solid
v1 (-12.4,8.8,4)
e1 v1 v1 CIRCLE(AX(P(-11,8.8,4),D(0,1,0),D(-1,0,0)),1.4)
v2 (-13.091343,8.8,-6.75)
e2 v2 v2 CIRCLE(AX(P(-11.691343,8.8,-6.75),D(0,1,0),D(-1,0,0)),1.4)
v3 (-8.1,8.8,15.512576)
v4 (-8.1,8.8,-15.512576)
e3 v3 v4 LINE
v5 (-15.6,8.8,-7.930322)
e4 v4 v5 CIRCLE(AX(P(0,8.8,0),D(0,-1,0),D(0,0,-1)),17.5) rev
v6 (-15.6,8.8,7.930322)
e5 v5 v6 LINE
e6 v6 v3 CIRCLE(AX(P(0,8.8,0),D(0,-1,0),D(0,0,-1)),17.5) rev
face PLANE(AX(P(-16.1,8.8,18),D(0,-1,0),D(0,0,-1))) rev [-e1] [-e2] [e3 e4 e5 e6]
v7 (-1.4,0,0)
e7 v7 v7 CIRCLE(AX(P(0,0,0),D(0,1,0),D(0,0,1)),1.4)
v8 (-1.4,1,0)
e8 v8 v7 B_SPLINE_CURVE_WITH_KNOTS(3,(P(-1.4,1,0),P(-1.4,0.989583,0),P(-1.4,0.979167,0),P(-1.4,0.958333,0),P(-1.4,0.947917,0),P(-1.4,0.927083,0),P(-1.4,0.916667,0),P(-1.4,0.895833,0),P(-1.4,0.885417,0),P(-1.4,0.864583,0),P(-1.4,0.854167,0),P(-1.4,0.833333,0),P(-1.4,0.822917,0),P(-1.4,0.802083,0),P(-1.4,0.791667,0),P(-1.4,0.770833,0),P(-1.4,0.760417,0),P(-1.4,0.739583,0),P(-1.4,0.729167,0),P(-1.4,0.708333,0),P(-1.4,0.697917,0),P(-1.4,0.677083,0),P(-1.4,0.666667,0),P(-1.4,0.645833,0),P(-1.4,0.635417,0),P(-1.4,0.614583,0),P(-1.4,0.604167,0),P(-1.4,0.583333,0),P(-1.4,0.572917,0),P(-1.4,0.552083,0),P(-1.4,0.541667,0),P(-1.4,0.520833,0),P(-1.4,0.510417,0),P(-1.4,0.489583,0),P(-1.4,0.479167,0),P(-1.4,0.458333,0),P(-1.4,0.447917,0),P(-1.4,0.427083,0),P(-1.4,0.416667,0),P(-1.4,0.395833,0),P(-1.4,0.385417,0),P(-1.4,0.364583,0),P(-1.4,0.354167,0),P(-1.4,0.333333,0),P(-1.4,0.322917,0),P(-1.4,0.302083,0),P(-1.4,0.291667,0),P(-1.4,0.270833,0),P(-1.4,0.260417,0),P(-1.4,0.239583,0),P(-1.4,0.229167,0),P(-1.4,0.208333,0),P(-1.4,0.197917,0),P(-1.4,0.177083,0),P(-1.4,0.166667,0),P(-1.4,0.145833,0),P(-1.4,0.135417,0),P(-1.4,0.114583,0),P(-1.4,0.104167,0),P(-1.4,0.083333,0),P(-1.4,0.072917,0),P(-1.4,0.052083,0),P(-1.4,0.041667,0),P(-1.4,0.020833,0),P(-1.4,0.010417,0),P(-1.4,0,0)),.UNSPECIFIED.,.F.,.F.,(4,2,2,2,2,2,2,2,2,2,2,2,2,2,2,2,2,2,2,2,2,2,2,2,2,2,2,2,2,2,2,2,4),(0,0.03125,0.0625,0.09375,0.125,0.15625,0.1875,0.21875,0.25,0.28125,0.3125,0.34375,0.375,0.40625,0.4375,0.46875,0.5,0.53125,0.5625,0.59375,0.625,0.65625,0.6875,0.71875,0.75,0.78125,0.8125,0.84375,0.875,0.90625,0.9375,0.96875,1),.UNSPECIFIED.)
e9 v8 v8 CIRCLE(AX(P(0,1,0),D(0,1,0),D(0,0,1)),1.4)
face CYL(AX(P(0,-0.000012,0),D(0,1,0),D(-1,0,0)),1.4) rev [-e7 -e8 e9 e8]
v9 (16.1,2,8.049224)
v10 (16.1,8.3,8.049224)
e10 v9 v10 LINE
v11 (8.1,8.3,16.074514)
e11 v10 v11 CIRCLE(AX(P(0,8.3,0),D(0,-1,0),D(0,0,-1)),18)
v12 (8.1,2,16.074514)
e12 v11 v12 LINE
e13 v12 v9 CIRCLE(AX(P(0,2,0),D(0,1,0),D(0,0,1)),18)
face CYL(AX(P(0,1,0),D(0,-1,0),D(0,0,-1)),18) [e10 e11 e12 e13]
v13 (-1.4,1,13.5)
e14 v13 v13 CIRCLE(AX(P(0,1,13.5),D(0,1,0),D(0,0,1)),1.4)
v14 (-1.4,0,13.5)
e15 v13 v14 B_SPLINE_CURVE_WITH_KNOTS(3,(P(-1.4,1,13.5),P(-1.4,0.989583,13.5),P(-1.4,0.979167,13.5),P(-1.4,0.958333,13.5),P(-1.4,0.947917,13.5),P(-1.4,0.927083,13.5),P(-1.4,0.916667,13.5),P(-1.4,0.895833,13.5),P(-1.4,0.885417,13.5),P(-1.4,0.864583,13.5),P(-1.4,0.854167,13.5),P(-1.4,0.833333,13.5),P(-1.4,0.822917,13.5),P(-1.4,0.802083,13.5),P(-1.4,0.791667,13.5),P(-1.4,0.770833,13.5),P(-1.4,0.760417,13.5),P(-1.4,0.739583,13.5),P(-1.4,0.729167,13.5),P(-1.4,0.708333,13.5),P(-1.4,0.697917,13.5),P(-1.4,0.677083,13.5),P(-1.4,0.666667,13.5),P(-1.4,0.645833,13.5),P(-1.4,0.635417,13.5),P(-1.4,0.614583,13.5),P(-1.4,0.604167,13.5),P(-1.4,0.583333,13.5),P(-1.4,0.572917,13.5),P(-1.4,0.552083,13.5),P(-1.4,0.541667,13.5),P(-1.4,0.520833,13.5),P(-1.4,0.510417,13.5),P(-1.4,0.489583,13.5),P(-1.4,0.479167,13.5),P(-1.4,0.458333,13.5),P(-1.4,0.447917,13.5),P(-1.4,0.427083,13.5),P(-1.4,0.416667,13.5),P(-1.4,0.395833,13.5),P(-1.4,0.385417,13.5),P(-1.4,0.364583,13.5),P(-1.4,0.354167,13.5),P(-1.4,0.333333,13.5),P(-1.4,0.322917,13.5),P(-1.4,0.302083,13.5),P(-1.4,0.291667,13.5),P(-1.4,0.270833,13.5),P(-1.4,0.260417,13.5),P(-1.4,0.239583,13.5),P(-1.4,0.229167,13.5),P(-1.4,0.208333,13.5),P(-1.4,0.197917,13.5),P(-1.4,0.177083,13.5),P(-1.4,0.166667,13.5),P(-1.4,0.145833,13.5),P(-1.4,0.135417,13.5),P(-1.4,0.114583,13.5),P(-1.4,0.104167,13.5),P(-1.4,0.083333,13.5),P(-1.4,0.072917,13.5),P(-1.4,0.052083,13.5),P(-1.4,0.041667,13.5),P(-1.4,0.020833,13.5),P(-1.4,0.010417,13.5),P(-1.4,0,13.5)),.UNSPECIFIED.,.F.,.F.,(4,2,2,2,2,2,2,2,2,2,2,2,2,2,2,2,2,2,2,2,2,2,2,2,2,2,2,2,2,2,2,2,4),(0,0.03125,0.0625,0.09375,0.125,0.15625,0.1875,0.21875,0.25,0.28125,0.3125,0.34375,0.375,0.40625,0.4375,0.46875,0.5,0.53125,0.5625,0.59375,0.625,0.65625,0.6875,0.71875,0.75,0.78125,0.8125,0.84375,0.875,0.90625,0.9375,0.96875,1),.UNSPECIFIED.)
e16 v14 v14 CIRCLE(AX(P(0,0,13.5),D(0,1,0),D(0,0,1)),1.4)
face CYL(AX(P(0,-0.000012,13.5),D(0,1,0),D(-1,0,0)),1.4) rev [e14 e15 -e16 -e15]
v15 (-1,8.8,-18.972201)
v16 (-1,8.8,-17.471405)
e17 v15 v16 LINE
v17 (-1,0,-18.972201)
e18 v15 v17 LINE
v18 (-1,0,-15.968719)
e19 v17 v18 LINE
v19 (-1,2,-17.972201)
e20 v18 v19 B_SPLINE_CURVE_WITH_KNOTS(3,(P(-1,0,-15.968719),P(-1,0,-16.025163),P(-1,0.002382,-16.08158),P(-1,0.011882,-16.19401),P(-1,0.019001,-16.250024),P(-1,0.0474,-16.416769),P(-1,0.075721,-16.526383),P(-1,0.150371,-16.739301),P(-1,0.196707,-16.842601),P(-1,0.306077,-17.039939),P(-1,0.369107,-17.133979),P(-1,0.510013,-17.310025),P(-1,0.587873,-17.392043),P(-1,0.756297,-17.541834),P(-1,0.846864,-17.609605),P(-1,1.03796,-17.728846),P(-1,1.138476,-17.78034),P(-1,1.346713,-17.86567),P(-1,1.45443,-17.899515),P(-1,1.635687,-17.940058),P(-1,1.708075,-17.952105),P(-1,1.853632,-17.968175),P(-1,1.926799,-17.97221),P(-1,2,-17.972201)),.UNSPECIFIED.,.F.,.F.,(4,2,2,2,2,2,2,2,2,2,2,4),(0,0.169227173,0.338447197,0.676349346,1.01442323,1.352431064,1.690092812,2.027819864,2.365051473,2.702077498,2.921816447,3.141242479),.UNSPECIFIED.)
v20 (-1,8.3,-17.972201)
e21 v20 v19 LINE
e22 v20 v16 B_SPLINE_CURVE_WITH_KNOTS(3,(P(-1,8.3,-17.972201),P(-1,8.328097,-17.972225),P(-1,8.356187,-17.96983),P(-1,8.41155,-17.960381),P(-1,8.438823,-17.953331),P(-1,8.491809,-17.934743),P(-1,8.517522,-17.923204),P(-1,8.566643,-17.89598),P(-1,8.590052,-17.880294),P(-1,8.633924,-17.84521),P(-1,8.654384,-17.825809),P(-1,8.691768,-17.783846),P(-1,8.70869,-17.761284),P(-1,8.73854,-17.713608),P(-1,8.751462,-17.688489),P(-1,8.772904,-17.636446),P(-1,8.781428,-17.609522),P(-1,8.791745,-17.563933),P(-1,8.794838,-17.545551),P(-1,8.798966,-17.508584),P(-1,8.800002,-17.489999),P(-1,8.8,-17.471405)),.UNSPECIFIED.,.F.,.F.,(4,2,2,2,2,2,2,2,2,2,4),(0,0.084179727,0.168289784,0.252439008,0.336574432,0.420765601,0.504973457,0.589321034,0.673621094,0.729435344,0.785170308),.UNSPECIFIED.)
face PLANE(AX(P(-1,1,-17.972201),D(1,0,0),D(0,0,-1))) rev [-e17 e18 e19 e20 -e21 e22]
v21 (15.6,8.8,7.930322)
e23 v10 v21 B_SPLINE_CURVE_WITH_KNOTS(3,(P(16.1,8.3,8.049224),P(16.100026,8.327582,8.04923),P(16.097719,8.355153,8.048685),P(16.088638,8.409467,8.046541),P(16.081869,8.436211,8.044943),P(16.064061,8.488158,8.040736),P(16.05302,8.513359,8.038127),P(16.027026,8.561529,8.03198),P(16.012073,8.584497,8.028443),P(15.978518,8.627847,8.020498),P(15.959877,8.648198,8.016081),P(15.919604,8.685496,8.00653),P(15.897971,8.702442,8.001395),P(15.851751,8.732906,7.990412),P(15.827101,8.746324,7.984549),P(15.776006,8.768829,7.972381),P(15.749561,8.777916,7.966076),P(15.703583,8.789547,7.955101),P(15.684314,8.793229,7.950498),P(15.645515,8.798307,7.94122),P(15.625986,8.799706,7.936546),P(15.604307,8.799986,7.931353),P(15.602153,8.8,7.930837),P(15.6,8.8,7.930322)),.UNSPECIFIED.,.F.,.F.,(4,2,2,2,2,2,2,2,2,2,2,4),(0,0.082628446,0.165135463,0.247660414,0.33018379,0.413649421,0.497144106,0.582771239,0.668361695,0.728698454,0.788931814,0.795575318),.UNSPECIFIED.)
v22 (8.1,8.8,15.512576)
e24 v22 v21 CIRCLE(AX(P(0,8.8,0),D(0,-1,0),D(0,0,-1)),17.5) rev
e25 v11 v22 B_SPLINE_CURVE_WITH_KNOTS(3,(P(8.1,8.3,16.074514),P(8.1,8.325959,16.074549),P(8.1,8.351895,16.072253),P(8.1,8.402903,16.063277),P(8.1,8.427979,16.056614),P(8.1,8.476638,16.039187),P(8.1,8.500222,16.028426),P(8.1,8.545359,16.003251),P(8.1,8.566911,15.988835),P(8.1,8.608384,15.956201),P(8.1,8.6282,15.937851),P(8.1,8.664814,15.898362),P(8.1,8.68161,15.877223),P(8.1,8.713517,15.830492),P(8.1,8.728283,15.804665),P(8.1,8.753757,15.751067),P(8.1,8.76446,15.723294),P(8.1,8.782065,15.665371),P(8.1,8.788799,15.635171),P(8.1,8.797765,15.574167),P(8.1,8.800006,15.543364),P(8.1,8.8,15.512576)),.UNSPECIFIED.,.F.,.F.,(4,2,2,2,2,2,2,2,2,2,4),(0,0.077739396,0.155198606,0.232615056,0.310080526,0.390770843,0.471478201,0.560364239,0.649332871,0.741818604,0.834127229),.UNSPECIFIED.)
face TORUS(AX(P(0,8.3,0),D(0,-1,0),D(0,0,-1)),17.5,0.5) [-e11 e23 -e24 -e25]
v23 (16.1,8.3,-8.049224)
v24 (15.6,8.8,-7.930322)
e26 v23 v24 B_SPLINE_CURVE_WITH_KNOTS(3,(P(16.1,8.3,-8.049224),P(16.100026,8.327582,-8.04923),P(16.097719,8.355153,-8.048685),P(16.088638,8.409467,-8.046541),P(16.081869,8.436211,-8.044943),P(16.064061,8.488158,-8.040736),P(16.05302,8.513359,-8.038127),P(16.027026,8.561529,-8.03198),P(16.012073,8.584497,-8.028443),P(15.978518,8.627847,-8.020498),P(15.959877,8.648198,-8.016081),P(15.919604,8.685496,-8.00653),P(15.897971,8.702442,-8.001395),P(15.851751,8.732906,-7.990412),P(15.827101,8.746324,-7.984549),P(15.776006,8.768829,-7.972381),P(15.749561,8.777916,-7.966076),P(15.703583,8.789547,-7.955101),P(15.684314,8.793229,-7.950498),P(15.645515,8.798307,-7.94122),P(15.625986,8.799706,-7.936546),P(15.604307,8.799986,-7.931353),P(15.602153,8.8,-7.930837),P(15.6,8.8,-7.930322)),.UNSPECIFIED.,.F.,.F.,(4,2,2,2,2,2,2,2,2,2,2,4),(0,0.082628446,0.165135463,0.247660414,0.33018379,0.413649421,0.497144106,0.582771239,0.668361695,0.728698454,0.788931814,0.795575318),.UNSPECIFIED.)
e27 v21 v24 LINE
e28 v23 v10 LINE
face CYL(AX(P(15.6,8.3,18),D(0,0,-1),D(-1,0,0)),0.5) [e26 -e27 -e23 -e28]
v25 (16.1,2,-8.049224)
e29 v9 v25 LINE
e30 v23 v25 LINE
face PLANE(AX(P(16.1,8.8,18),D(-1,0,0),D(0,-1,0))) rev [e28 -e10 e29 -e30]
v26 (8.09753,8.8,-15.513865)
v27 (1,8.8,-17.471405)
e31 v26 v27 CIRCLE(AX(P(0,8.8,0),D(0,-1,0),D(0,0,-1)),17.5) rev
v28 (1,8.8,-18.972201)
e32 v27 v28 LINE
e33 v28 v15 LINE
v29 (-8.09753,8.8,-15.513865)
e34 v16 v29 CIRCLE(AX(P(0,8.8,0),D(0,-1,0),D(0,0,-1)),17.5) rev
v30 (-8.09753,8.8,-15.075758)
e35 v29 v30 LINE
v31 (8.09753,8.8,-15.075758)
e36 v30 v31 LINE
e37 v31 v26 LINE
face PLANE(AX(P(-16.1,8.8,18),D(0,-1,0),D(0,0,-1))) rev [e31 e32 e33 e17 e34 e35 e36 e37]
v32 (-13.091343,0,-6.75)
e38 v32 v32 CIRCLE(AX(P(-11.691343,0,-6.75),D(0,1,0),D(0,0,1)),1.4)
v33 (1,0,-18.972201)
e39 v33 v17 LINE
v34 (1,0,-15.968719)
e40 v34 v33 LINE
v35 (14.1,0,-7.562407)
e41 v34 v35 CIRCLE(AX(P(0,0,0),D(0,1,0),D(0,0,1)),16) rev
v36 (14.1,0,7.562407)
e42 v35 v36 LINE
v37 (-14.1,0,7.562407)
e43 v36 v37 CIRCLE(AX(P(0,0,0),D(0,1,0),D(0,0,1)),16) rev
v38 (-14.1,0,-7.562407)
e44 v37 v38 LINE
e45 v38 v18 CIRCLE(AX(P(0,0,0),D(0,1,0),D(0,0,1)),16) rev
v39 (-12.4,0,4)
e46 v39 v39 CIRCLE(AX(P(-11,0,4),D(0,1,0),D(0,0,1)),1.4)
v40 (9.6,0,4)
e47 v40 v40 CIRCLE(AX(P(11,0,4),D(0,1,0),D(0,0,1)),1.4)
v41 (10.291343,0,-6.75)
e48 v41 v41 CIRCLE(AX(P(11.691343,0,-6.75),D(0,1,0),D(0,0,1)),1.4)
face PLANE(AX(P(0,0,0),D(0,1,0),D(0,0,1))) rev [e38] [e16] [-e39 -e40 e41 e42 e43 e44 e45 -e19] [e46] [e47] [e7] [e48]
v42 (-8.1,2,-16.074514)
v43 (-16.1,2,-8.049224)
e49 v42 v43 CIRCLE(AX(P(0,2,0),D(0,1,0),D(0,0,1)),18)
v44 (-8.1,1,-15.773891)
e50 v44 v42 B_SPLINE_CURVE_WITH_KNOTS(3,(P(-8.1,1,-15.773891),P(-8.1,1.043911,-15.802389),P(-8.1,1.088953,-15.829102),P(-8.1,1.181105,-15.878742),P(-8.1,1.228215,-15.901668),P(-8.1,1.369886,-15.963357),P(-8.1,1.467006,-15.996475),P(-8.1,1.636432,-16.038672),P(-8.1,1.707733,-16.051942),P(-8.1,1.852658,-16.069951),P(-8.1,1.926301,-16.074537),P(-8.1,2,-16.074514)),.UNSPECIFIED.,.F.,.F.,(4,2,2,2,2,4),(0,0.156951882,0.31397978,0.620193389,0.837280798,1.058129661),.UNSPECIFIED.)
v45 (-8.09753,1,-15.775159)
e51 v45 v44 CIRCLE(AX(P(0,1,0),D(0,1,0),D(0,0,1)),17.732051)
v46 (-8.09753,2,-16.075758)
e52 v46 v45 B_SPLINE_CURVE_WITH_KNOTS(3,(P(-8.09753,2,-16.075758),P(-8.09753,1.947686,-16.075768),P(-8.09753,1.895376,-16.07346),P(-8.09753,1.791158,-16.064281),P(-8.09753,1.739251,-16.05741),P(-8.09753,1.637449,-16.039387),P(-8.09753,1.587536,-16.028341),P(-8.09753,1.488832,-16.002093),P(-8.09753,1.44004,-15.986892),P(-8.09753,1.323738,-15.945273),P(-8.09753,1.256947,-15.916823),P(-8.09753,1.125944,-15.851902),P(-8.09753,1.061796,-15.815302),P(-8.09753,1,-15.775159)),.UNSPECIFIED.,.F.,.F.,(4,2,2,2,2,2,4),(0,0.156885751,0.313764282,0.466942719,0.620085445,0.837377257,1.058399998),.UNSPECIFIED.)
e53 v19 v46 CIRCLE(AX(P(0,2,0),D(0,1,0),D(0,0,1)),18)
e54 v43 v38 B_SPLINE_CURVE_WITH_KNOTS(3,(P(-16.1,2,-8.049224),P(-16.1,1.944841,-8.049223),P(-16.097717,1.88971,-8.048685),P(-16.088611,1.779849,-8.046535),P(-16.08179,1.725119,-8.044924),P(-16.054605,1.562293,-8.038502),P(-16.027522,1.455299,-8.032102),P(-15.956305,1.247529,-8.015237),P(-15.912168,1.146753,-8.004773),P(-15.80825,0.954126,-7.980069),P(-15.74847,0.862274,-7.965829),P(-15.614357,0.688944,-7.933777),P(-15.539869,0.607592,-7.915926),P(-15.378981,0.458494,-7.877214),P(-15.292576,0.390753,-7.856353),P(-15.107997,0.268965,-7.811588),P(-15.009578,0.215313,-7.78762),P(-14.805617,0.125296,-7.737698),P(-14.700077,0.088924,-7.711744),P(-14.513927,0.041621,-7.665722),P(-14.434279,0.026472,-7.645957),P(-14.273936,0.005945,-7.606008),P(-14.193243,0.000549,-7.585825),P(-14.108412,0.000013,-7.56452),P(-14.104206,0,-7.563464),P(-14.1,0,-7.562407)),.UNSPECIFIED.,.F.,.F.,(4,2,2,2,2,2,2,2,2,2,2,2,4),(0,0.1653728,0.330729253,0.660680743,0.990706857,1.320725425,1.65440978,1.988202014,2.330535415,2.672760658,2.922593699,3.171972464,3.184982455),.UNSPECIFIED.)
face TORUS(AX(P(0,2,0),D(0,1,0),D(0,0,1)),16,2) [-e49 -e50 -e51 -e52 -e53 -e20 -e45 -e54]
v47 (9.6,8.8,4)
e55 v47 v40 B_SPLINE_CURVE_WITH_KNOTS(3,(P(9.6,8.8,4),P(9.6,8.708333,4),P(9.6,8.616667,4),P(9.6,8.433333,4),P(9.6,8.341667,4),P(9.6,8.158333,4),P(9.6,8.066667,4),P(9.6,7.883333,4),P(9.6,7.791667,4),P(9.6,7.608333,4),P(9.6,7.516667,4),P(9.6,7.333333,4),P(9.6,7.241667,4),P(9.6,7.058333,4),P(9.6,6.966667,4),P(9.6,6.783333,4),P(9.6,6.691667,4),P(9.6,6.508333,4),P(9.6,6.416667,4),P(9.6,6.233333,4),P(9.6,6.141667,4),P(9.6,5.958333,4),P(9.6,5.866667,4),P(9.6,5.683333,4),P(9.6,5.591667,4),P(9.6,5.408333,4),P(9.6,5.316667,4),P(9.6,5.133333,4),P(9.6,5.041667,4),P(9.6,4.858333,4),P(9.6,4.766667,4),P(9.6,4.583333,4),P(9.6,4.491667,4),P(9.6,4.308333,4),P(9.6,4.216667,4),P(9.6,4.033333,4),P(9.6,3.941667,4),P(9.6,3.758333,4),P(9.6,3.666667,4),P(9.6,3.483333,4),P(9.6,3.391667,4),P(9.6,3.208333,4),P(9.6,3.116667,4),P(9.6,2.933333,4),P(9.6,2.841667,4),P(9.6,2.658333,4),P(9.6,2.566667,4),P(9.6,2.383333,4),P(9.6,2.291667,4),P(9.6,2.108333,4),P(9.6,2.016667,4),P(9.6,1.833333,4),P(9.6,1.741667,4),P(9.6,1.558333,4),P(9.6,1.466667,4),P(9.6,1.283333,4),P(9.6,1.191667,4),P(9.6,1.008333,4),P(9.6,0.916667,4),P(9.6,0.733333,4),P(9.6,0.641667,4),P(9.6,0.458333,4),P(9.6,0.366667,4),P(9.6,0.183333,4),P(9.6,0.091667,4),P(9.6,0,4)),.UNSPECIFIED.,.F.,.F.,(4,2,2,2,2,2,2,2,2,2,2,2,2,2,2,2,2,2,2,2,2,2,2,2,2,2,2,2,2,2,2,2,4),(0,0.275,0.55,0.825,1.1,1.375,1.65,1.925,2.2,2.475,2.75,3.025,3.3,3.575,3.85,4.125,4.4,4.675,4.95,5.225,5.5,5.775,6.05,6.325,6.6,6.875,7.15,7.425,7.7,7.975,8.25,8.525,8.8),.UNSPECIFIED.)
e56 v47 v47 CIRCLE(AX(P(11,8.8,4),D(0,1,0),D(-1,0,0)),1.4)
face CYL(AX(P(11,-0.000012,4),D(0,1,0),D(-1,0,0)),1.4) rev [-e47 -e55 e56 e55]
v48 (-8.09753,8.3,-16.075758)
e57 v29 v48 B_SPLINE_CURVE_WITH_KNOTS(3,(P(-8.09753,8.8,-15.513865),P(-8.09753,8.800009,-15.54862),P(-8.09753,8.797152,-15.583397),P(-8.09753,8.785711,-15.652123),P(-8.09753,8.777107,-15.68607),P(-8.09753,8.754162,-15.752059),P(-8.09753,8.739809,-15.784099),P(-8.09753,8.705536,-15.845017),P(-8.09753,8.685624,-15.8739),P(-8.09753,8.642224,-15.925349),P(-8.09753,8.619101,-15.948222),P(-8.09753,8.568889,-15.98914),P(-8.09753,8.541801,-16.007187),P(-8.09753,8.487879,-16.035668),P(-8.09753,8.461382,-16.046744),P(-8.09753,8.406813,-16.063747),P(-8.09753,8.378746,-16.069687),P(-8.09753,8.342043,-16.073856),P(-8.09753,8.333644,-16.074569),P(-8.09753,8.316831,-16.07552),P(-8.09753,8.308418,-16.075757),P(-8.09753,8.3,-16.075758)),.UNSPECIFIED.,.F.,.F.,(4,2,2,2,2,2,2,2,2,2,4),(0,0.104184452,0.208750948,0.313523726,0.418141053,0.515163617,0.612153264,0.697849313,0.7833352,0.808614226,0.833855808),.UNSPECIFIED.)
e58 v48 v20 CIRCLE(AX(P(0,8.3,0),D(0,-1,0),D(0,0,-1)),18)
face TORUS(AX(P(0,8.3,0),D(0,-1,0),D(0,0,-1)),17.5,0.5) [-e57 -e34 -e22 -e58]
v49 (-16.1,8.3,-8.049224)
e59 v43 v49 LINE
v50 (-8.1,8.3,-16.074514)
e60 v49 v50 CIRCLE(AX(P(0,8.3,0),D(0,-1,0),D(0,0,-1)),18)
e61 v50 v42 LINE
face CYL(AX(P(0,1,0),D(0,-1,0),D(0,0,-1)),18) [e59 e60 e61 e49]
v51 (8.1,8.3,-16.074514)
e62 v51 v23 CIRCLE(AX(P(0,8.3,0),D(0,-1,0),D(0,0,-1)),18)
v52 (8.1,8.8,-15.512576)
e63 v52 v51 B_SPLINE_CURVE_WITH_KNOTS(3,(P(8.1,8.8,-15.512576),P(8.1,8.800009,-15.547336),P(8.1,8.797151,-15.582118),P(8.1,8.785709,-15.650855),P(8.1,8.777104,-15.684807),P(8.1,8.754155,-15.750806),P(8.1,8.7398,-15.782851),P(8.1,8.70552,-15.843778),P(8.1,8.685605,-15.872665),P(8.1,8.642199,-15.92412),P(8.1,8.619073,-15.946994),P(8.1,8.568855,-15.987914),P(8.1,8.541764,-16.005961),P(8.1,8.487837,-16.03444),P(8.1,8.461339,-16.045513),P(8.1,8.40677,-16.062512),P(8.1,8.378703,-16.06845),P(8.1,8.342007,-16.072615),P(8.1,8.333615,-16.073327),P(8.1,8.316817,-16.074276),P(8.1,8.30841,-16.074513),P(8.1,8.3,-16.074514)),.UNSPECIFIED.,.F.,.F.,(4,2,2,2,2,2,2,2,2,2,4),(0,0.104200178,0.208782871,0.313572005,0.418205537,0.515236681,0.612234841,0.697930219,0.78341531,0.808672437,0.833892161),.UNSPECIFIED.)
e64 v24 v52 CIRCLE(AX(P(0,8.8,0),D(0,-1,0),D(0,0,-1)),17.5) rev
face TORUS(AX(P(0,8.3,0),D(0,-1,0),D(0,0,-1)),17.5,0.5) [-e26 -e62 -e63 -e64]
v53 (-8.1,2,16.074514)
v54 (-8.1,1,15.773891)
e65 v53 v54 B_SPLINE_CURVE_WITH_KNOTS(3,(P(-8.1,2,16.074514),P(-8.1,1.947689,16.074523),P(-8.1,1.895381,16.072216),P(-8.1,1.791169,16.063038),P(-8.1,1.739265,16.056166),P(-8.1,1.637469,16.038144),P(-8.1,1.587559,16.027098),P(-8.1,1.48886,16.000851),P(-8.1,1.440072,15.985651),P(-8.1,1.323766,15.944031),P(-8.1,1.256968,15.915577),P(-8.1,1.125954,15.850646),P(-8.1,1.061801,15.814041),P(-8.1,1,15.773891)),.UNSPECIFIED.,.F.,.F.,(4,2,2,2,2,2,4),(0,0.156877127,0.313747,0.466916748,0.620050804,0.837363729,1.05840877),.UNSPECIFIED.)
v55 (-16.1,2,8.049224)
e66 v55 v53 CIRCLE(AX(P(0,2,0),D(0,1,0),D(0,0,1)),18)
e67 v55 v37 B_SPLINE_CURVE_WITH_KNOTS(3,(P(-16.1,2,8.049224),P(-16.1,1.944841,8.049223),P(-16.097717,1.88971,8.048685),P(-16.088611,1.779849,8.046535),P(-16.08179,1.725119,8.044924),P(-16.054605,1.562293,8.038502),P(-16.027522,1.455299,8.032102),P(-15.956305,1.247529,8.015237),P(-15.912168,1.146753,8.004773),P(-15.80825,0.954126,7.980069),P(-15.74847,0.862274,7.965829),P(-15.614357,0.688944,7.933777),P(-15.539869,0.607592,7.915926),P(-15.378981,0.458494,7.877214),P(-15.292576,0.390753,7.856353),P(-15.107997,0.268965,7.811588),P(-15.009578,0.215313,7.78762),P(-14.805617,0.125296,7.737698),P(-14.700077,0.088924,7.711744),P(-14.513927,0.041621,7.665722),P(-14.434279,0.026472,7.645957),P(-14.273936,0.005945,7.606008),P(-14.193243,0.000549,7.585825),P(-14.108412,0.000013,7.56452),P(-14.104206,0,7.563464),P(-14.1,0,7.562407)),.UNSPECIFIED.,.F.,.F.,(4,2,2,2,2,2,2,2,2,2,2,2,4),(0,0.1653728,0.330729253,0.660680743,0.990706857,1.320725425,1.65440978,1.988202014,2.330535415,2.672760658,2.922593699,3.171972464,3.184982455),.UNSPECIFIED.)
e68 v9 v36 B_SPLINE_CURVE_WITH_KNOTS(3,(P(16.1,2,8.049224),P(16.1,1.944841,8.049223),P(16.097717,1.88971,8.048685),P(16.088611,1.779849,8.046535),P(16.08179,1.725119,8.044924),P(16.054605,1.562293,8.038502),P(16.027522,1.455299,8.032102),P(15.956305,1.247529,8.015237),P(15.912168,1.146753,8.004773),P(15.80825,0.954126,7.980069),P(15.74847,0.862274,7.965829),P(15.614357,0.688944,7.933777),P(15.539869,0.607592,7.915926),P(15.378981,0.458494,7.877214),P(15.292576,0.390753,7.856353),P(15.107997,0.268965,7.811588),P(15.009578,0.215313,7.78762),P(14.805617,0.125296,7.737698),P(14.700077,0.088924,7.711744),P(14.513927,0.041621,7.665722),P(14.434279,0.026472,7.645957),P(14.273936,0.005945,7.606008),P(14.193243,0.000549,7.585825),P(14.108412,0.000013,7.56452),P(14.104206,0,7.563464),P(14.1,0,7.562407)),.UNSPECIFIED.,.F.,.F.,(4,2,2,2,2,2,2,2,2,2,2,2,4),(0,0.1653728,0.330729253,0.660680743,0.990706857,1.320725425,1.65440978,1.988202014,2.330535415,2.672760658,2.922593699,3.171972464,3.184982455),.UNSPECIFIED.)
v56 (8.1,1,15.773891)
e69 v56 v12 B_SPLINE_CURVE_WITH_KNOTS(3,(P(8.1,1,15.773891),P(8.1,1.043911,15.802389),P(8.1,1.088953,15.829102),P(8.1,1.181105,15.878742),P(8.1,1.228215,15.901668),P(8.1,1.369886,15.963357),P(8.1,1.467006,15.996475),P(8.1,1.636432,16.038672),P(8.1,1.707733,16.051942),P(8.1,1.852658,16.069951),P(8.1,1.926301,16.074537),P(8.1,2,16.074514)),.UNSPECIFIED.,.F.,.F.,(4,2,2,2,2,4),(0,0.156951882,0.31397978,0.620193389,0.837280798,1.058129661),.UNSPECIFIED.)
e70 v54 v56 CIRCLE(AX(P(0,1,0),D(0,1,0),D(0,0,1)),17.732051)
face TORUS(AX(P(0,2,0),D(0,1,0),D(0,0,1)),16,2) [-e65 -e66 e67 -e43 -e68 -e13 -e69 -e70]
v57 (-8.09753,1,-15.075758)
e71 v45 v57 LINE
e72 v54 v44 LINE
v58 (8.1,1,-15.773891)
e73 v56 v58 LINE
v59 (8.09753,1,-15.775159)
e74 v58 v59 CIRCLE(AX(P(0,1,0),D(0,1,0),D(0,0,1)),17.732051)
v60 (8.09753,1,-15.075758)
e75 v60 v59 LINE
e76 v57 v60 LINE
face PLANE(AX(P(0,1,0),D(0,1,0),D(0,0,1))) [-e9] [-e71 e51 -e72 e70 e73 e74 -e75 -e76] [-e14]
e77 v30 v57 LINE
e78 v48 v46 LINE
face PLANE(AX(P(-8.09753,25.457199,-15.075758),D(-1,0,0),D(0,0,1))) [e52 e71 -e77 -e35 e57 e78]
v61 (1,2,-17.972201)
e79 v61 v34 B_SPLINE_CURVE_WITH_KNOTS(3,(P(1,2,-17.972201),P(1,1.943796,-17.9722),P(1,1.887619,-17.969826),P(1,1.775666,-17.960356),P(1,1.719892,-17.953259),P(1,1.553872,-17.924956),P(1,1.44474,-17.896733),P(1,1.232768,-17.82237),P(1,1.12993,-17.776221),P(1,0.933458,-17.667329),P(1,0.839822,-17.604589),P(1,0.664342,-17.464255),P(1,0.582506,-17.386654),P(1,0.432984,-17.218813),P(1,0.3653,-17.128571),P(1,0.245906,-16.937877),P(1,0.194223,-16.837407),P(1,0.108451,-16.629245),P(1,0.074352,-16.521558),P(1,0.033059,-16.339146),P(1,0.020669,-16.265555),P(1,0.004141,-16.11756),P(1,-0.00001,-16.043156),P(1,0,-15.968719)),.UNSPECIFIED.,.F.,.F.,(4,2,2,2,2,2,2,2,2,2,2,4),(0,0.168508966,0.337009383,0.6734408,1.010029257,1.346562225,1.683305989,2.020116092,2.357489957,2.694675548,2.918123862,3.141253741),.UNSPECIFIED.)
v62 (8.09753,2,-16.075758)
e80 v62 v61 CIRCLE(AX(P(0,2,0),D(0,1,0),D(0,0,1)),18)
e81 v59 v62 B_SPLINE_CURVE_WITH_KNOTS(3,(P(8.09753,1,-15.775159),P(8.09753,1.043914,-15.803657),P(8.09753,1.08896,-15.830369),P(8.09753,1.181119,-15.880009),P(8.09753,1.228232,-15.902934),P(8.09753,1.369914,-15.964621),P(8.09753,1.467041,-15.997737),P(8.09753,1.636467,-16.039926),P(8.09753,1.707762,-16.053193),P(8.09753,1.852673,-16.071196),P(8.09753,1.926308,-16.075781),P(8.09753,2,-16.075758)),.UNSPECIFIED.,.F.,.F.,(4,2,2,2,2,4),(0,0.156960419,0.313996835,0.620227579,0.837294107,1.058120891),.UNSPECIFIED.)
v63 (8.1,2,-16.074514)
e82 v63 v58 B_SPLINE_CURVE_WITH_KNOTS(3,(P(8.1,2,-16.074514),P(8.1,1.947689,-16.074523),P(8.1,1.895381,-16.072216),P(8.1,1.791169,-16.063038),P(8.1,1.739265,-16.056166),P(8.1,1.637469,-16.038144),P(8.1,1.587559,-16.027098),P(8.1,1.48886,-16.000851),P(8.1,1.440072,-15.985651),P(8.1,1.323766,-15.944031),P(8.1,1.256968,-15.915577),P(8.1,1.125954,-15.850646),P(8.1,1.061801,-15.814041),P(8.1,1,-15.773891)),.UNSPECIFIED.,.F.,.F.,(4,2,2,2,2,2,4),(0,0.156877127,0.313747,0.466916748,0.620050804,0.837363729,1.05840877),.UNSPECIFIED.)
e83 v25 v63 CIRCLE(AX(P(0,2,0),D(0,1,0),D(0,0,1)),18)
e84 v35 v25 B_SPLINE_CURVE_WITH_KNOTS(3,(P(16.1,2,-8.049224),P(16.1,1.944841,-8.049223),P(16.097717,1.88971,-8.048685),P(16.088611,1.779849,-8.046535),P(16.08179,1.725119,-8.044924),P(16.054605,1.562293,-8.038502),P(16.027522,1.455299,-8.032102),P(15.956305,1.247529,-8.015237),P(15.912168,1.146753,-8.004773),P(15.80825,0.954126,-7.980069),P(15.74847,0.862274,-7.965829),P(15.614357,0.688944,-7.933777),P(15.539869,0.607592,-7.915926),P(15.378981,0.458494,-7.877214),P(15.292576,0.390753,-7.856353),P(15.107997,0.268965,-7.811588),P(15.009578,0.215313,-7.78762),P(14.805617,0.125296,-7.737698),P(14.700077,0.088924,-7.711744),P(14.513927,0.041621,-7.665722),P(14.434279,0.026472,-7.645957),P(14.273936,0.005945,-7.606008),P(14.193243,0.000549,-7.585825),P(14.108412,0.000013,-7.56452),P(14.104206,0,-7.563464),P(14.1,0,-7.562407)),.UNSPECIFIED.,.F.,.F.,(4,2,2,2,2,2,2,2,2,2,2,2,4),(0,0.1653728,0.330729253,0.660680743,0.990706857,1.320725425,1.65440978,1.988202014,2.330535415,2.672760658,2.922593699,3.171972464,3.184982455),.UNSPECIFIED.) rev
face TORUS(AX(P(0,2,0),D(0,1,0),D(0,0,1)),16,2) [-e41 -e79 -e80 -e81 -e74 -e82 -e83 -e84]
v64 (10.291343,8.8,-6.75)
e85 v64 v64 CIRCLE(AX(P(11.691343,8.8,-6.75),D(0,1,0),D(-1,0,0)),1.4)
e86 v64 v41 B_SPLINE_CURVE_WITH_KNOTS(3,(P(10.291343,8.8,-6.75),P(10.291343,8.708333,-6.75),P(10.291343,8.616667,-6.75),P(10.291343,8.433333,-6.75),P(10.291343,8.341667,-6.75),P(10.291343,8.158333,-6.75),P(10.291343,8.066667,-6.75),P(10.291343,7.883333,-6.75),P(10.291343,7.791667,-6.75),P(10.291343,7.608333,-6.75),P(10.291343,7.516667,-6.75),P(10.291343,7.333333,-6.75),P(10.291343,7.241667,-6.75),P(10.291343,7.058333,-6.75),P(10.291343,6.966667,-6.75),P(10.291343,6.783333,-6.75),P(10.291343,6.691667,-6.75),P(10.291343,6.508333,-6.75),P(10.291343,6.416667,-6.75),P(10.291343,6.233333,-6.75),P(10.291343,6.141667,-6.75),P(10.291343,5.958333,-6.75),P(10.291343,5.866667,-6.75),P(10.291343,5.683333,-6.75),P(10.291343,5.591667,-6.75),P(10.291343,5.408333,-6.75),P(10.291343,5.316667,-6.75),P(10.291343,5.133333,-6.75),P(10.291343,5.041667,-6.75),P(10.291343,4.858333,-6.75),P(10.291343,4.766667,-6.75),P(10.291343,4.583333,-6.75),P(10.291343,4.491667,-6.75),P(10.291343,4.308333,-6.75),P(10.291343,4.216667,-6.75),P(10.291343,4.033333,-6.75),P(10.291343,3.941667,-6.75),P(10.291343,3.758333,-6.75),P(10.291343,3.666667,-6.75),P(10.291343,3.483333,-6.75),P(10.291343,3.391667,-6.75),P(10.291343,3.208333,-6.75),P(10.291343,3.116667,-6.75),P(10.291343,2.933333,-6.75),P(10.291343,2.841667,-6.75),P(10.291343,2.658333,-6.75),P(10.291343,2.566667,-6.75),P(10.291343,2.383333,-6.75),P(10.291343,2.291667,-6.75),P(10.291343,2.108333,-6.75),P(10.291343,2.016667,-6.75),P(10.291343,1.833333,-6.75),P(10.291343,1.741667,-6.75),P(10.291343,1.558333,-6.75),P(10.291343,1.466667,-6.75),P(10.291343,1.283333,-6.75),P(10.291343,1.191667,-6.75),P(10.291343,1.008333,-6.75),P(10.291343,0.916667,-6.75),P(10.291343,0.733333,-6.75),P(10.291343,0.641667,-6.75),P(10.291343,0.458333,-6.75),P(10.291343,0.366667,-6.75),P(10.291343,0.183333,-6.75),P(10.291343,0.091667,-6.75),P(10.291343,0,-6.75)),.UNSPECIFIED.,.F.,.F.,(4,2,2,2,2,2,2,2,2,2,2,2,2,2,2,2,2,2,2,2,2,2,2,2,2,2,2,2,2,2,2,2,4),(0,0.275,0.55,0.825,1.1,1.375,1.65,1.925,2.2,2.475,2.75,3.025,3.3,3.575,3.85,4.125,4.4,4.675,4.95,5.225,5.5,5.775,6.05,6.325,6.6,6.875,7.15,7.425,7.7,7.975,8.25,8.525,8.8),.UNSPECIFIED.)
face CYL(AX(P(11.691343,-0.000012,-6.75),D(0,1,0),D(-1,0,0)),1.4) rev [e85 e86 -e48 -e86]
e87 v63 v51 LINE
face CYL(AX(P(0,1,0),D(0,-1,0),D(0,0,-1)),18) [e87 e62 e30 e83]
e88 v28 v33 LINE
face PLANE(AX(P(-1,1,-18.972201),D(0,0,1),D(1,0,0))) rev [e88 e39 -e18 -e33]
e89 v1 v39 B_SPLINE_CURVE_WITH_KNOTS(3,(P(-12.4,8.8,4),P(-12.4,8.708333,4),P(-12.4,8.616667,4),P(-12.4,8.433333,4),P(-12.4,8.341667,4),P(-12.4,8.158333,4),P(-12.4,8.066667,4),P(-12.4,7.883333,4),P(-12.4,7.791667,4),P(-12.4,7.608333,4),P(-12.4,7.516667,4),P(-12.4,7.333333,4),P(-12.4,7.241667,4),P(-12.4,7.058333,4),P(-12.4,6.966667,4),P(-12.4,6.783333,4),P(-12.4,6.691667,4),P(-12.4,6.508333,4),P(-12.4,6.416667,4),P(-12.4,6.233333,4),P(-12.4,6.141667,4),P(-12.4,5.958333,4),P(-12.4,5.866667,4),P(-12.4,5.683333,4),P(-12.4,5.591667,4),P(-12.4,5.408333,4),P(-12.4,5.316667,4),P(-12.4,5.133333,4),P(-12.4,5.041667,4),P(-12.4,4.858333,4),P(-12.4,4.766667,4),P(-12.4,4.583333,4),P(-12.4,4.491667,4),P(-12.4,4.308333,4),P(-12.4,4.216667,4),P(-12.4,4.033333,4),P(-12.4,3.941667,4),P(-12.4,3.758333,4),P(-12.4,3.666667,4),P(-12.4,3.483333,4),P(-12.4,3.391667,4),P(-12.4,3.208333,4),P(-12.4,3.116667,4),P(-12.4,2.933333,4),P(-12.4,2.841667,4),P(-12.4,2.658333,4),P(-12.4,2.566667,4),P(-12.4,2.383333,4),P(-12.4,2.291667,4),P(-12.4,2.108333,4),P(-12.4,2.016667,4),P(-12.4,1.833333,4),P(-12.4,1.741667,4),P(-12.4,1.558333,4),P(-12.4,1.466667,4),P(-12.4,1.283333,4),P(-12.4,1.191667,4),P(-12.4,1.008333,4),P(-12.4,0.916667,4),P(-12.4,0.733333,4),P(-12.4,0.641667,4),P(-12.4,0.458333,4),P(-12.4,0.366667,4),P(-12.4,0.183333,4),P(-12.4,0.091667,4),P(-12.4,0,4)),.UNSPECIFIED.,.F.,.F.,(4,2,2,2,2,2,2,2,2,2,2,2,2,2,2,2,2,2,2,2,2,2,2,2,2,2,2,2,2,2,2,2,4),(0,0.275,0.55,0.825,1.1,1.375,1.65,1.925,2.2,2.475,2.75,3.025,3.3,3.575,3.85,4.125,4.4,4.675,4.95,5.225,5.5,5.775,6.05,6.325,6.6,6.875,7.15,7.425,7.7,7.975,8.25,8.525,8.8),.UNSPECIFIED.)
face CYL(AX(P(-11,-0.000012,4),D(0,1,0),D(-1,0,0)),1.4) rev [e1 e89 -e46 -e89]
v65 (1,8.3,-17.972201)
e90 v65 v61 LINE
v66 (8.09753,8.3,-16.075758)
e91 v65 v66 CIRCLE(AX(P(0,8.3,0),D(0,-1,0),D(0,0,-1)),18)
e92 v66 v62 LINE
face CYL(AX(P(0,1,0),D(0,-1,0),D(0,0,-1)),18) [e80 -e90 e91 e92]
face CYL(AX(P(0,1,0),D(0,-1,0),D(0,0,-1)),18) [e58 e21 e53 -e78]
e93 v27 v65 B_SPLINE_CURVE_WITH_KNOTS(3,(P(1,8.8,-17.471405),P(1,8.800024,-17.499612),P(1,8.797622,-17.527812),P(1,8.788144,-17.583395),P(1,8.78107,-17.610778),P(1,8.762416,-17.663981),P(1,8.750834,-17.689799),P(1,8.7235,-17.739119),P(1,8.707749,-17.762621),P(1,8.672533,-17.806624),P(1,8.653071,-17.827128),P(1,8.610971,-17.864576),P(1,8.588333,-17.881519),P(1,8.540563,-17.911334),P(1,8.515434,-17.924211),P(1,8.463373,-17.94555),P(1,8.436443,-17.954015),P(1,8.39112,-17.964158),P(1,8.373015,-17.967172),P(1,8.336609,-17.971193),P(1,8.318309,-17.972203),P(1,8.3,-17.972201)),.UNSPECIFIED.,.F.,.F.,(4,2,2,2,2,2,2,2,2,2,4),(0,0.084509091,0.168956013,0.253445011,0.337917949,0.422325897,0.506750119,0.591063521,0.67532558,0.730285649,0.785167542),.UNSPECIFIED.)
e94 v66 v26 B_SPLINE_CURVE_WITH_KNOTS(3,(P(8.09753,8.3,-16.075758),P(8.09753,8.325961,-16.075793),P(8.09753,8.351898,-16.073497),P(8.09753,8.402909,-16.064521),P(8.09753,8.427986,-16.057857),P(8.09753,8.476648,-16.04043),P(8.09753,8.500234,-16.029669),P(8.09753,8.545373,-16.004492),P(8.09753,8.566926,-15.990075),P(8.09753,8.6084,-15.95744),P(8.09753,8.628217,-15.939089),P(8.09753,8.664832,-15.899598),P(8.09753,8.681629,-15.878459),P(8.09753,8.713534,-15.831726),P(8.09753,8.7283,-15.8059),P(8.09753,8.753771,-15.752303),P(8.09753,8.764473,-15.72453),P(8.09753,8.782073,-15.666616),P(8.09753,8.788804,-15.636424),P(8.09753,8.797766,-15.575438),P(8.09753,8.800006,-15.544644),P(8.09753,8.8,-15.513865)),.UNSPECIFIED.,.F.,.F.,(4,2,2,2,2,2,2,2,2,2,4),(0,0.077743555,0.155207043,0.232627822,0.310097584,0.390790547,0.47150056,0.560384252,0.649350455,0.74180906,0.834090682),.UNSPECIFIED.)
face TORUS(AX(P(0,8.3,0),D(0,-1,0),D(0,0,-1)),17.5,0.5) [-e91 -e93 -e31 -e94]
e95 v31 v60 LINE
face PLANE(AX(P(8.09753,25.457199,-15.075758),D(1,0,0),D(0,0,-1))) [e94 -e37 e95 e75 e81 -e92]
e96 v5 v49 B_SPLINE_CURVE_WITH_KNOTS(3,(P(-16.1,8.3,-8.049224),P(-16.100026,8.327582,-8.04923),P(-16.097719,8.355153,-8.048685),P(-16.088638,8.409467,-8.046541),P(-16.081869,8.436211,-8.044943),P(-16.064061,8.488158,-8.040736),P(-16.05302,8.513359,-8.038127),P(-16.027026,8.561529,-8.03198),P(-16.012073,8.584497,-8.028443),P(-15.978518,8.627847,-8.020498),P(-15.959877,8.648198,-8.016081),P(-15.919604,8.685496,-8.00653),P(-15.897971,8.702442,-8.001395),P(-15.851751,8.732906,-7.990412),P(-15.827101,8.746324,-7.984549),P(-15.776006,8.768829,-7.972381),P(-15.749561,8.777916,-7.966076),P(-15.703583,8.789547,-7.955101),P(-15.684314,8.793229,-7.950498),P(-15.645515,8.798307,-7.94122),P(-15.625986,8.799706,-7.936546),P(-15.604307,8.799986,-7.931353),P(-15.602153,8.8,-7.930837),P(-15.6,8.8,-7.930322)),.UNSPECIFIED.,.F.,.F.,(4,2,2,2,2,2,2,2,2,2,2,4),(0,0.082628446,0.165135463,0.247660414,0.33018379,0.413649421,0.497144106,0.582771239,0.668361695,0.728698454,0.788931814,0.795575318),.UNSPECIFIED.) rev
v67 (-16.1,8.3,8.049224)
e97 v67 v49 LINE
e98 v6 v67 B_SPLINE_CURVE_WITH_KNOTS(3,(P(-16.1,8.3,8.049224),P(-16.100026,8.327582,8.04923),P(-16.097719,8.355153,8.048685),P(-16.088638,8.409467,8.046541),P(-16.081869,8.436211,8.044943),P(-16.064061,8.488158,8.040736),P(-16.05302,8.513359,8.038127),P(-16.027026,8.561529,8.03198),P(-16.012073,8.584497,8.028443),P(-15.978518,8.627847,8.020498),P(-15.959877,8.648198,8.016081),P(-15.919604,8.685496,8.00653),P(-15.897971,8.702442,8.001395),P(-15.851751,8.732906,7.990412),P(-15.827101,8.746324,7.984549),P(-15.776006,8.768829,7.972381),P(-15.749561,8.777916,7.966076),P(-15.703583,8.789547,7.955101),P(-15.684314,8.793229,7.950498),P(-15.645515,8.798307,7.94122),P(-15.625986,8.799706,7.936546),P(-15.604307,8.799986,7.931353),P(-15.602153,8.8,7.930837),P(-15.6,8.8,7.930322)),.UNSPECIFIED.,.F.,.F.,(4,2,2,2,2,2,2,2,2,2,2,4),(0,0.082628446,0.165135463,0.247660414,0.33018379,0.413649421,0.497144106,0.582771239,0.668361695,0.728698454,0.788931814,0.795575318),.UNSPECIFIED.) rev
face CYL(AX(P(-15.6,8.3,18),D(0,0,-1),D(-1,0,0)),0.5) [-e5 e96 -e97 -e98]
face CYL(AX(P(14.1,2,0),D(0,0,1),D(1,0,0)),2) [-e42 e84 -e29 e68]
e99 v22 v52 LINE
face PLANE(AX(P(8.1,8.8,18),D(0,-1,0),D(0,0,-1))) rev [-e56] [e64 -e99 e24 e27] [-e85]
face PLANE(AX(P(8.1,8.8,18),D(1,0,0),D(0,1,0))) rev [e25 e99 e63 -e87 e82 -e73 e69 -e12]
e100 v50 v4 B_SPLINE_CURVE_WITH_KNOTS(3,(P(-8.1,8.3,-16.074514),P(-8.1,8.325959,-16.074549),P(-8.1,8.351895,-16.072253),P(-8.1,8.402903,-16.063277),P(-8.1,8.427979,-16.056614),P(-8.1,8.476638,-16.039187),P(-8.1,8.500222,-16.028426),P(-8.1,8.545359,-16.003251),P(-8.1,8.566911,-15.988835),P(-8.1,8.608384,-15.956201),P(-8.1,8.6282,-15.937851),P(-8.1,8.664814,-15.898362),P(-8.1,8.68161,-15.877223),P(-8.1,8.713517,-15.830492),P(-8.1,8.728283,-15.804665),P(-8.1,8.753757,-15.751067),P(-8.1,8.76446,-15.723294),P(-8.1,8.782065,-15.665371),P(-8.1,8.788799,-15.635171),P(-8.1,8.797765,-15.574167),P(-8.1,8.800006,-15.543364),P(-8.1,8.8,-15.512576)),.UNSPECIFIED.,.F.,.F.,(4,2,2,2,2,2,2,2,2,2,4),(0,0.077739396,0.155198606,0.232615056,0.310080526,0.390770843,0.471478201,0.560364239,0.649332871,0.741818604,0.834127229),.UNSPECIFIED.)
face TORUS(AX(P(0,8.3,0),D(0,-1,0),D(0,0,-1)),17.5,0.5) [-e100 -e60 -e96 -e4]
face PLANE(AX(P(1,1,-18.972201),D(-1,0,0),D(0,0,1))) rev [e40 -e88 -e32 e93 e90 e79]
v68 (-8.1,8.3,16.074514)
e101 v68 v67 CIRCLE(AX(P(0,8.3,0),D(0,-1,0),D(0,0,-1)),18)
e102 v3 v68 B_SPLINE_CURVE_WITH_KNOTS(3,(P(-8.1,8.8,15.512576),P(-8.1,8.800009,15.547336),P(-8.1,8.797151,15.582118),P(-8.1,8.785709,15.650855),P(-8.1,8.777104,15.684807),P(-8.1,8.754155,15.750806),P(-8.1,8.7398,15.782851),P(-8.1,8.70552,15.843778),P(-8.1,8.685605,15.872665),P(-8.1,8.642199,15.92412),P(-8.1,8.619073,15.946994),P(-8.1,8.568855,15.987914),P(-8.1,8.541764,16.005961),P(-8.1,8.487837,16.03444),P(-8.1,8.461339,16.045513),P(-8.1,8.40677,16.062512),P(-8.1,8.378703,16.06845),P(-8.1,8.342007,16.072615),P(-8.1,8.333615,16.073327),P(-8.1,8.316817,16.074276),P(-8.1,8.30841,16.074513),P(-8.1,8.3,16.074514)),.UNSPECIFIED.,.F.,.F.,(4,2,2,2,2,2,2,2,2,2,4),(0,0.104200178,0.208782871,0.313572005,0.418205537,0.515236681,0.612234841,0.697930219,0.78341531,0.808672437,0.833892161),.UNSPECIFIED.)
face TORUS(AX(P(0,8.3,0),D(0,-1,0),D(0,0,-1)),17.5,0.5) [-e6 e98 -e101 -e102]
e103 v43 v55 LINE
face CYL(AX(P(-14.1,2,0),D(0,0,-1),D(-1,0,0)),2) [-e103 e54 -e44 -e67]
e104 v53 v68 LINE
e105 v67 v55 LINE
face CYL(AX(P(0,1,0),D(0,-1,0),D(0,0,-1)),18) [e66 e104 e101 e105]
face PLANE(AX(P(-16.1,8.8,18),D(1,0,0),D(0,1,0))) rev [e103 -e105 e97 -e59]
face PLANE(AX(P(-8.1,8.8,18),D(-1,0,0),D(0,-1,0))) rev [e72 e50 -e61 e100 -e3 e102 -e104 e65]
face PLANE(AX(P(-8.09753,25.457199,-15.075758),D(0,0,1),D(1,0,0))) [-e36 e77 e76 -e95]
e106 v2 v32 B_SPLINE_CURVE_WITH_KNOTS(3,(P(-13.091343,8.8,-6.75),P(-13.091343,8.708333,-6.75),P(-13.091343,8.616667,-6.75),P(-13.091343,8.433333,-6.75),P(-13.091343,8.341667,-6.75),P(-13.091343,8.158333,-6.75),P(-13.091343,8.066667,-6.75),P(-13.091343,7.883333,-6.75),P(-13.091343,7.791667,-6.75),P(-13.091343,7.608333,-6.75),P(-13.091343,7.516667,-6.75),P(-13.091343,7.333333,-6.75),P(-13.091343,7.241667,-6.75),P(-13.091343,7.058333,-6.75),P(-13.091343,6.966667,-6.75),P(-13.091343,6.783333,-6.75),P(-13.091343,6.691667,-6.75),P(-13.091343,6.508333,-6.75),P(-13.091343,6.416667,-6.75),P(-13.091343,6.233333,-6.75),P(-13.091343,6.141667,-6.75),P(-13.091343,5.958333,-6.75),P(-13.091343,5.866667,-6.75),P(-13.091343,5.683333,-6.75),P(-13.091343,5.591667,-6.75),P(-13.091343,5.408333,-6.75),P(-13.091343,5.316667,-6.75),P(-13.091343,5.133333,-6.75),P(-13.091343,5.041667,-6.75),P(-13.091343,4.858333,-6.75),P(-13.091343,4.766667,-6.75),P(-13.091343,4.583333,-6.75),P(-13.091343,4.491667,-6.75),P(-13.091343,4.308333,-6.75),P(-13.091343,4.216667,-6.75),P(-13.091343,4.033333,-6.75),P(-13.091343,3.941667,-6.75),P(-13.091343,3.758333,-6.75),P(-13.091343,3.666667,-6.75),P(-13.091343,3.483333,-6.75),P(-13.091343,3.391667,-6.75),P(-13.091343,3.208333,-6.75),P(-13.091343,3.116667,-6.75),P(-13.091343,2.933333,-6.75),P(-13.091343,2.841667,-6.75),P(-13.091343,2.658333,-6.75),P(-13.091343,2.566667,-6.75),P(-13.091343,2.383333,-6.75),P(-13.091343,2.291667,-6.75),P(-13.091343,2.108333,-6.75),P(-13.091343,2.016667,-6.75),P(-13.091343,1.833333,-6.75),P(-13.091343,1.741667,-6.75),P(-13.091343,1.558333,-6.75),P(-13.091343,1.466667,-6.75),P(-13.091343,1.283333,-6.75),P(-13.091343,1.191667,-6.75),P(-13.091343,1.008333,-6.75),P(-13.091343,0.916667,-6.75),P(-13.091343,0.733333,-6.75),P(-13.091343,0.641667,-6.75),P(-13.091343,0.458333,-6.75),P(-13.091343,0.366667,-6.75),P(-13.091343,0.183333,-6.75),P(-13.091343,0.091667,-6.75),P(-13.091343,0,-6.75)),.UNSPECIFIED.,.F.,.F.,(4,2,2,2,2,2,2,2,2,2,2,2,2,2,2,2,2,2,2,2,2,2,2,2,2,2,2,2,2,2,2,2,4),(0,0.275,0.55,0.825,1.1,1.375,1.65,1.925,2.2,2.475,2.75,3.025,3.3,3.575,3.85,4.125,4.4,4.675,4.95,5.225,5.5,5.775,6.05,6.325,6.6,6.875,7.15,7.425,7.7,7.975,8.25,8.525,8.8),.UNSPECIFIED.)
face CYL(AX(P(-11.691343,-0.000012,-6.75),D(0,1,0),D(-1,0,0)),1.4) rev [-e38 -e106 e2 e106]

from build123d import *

# Parameters (mm, degrees)
BOSS_EXTRUDE1_DEPTH      = 1
BOSS_EXTRUDE2_DEPTH      = 18
BOSS_EXTRUDE2_DEPTH_BACK = 18.972201
SKETCH3_R                = 59.910539196270584
CUT_EXTRUDE1_DEPTH       = 28.593195008632154
CUT_EXTRUDE2_DEPTH       = 28.59319484059837
CUT_EXTRUDE2_DEPTH_BACK  = 28.59319484059837
SKETCH5_R                = 1.4
SKETCH5_R_2              = 1.3999999999999992
SKETCH5_R_3              = 1.400000000000003
SKETCH5_R_4              = 1.3999999999999988
SKETCH5_R_5              = 1.399999999999999
BOSS_EXTRUDE3_DEPTH      = 8.8
CUT_EXTRUDE3_DEPTH       = 28.290738383400775
FILLET1_R                = 2
FILLET2_R                = 0.5


with BuildPart() as part:
    # Sketch1 → Boss-Extrude1 (new body)
    with BuildSketch(Plane(origin=(0, 0, 0), x_dir=(1, 0, 0), z_dir=(0, 1, 0))):
        with BuildLine():
            Line((-1.0000000000000024, 17.97220075561143), (-1.0000000000000024, 18.97220075561143))
            Line((-1.0000000000000024, 18.97220075561143), (0.9999999999999977, 18.97220075561143))
            Line((0.9999999999999977, 18.97220075561143), (0.9999999999999981, 17.97220075561143))
            ThreePointArc((0.9999999999999981, 17.97220075561143), (-3.31e-15, -18), (-1.0000000000000024, 17.97220075561143))
        make_face()
    extrude(amount=BOSS_EXTRUDE1_DEPTH)

    # Sketch2 → Boss-Extrude2 (add, two sides: drawn at the far end of the back side and taken through both)
    with BuildSketch(Plane.XY.offset(-BOSS_EXTRUDE2_DEPTH_BACK)):
        Polygon((-16.1, 8.799999999999999), (-8.100000000000005, 8.799999999999999), (-8.099999999999996, 1), (-16.099999999999998, 1), align=None)
        Polygon((8.099999999999994, 8.799999999999999), (16.099999999999994, 8.799999999999999), (16.100000000000005, 1), (8.100000000000003, 0.9999999999999991), align=None)
    extrude(amount=BOSS_EXTRUDE2_DEPTH + BOSS_EXTRUDE2_DEPTH_BACK)

    # Sketch3 → Cut-Extrude1 (cut, through all)
    with BuildSketch(Plane.XZ):
        Circle(SKETCH3_R)
        with BuildLine():
            Line((-1.000000000000015, -17.97220075561143), (-1.0000000000000024, -18.97220075561143))
            Line((-1.0000000000000024, -18.97220075561143), (0.9999999999999977, -18.97220075561143))
            Line((0.9999999999999977, -18.97220075561143), (0.9999999999999927, -17.972200755611432))
            ThreePointArc((0.9999999999999927, -17.972200755611432), (1.309e-14, 18.000000000000004), (-1.000000000000015, -17.97220075561143))
        make_face(mode=Mode.SUBTRACT)
    extrude(amount=-CUT_EXTRUDE1_DEPTH, mode=Mode.SUBTRACT)

    # Sketch5 → Cut-Extrude2 (cut, two sides: drawn at the far end of the back side and taken through both)
    with BuildSketch(Plane(origin=(0, 0, 0), x_dir=(1, 0, 0), z_dir=(0, 1, 0)).offset(-CUT_EXTRUDE2_DEPTH_BACK)):
        with Locations(Location((0, 0, 0), (0, 0, 180))):
            Circle(SKETCH5_R)
        with Locations(Location((11, -4, 0), (0, 0, 180))):
            Circle(SKETCH5_R_2)
        with Locations(Location((-11, -4, 0), (0, 0, 180))):
            Circle(SKETCH5_R_2)
        with Locations(Location((-11.69134295108996, 6.749999999999895, 0), (0, 0, 180))):
            Circle(SKETCH5_R_3)
        with Locations(Location((1.197e-13, -13.499999999999998, 0), (0, 0, 180))):
            Circle(SKETCH5_R_4)
        with Locations(Location((11.691342951089881, 6.750000000000103, 0), (0, 0, 180))):
            Circle(SKETCH5_R_5)
    extrude(amount=CUT_EXTRUDE2_DEPTH + CUT_EXTRUDE2_DEPTH_BACK, mode=Mode.SUBTRACT)

    # Sketch6 → Boss-Extrude3 (add)
    with BuildSketch(Plane.XZ):
        with BuildLine():
            Line((-8.097530487747482, -15.075758146973973), (8.097530487747482, -15.075758146973973))
            Line((8.097530487747482, -15.075758146973973), (8.09753048774748, -16.075758146973975))
            ThreePointArc((8.09753048774748, -16.075758146973975), (4.646545909149893, -17.38992843901787), (0.9999999999999927, -17.972200755611432))
            Line((0.9999999999999927, -17.972200755611432), (0.9999999999999977, -18.97220075561143))
            Line((0.9999999999999977, -18.97220075561143), (-1.0000000000000024, -18.97220075561143))
            Line((-1.0000000000000024, -18.97220075561143), (-1.000000000000015, -17.97220075561143))
            ThreePointArc((-1.000000000000015, -17.97220075561143), (-4.646545909149902, -17.38992843901787), (-8.097530487747482, -16.075758146973975))
            Line((-8.097530487747482, -16.075758146973975), (-8.097530487747482, -15.075758146973973))
        make_face()
    extrude(amount=-BOSS_EXTRUDE3_DEPTH)

    # Sketch7 → Cut-Extrude3 (cut, through all)
    with BuildSketch(Plane(origin=(0, 1, 0), x_dir=(1, 0, 0), z_dir=(0, 1, 0))):
        with BuildLine():
            Line((16.099999999999994, 8.049223565040313), (16.099999999999994, -8.049223565040313))
            ThreePointArc((16.099999999999994, -8.049223565040313), (18.000000000000004, 0), (16.099999999999994, 8.049223565040313))
        make_face()
        with BuildLine():
            Line((-16.099999999999998, -8.049223565040306), (-16.099999999999998, 8.049223565040306))
            ThreePointArc((-16.099999999999998, 8.049223565040306), (-18.000000000000004, 2.2e-15), (-16.099999999999998, -8.049223565040306))
        make_face()
    extrude(amount=-CUT_EXTRUDE3_DEPTH, mode=Mode.SUBTRACT)

    # Fillet1
    # the kernel refuses this fillet: 2 mm, written as the material it takes off along each edge
    with BuildSketch(Plane(origin=(-3.872e-14, 0, -5.4e-16), x_dir=(0.9828239646934485, 0, 0.1845455348260998), z_dir=(0.1845455348260998, 0, -0.9828239646934485))) as fillet1_piece_1:
        with BuildLine():
            CenterArc((17.999999999999872 - FILLET1_R, -FILLET1_R), FILLET1_R, 6.36e-15, 90)
            Line((17.999999999999872, -FILLET1_R), (17.999999999999872, 0))
            Line((17.999999999999872, 0), (17.999999999999872 - FILLET1_R, 0))
        make_face()
    revolve(axis=Axis((-3.872e-14, 0, -5.4e-16), (0, -1, 0)), revolution_arc=158.7307255035683, mode=Mode.SUBTRACT)
    with BuildSketch(Plane(origin=(-3.872e-14, 0, -5.4e-16), x_dir=(0.4498628048748618, 0, -0.8930976748318865), z_dir=(-0.8930976748318865, 0, -0.4498628048748618))) as fillet1_piece_2:
        with BuildLine():
            CenterArc((18.000000000000004 - FILLET1_R, -FILLET1_R), FILLET1_R, 6.36e-15, 90)
            Line((18.000000000000007, -FILLET1_R), (18.000000000000004, 0))
            Line((18.000000000000004, 0), (18.000000000000004 - FILLET1_R, 0))
        make_face()
    revolve(axis=Axis((-3.872e-14, 0, -5.4e-16), (0, -1, 0)), revolution_arc=52.61883467829079, mode=Mode.SUBTRACT)
    with BuildSketch(Plane(origin=(16.099999999999994, 0, 13.049223565040313), x_dir=(-1, 0, 0), z_dir=(0, 0, -1))) as fillet1_piece_3:
        with BuildLine():
            CenterArc((FILLET1_R, FILLET1_R), FILLET1_R, 180, 90)
            Line((0, FILLET1_R), (0, 0))
            Line((0, 0), (FILLET1_R, 0))
        make_face()
    extrude(amount=26.098447130080626, mode=Mode.SUBTRACT)
    with BuildSketch(Plane(origin=(-16.099999999999998, 0, -13.049223565040311), x_dir=(1, 0, 0), z_dir=(0, 0, 1))) as fillet1_piece_4:
        with BuildLine():
            CenterArc((FILLET1_R, FILLET1_R), FILLET1_R, 180, 90)
            Line((0, FILLET1_R), (0, 0))
            Line((0, 0), (FILLET1_R, 0))
        make_face()
    extrude(amount=26.098447130080615, mode=Mode.SUBTRACT)
    with BuildSketch(Plane(origin=(-3.872e-14, 0, -5.4e-16), x_dir=(-0.9827864332200049, 0, -0.18474530218303542), z_dir=(-0.18474530218303542, 0, 0.9827864332200049))) as fillet1_piece_5:
        with BuildLine():
            CenterArc((18.000000000000007 - FILLET1_R, -FILLET1_R), FILLET1_R, 0, 90)
            Line((18.000000000000007 - FILLET1_R, 2.2e-16), (18.000000000000007, 0))
            Line((18.000000000000007, 0), (18.000000000000007, -FILLET1_R))
        make_face()
    revolve(axis=Axis((-3.872e-14, 0, -5.4e-16), (0, -1, 0)), revolution_arc=52.61883467829094, mode=Mode.SUBTRACT)
    with BuildSketch(Plane(origin=(-3.872e-14, 0, -5.4e-16), x_dir=(-0.44986280487485913, 0, -0.8930976748318878), z_dir=(-0.8930976748318878, 0, 0.44986280487485913))) as fillet1_piece_6_section:
        with BuildLine():
            CenterArc((18 - FILLET1_R, -FILLET1_R), FILLET1_R, 0, 89.9999999999999)
            Line((18 - FILLET1_R, 2.2e-16), (18, 0))
            Line((18, 0), (18, -FILLET1_R))
        make_face()
    fillet1_piece_6 = revolve(axis=Axis((-3.872e-14, 0, -5.4e-16), (0, -1, 0)), revolution_arc=39.46607540970417, mode=Mode.PRIVATE)
    fillet1_piece_6 = split(fillet1_piece_6, bisect_by=Plane(origin=(-1.0000000000000024, 0.45992141450225776, -16.842636156243355), z_dir=(-1, 0, 0)), keep=Keep.TOP, mode=Mode.PRIVATE)
    add(fillet1_piece_6, mode=Mode.SUBTRACT)
    with BuildSketch(Plane(origin=(-3.872e-14, 0, -5.4e-16), x_dir=(-0.44986280487485913, 0, -0.8930976748318878), z_dir=(-0.8930976748318878, 0, 0.44986280487485913))) as fillet1_piece_7_section:
        with BuildLine():
            CenterArc((18 - FILLET1_R, -FILLET1_R), FILLET1_R, 0, 89.9999999999999)
            Line((18 - FILLET1_R, 2.2e-16), (18, 0))
            Line((18, 0), (18, -FILLET1_R))
        make_face()
    fillet1_piece_7 = revolve(axis=Axis((-3.872e-14, 0, -5.4e-16), (0, -1, 0)), revolution_arc=39.46607540970417, mode=Mode.PRIVATE)
    fillet1_piece_7 = split(fillet1_piece_7, bisect_by=Plane(origin=(0.9999999999999897, 0.4612121351403519, -17.37087292856804), z_dir=(1, 0, 5e-15)), keep=Keep.TOP, mode=Mode.PRIVATE)
    add(fillet1_piece_7, mode=Mode.SUBTRACT)
    with BuildSketch(Plane(origin=(-3.872e-14, 0, -5.4e-16), x_dir=(-0.22037727986092012, 0, -0.9754147089936167), z_dir=(-0.9754147089936167, 0, 0.22037727986092012))) as fillet1_piece_8_section:
        with BuildLine():
            CenterArc((18.000000000000014 - FILLET1_R, -FILLET1_R), FILLET1_R, 1.272e-14, 90)
            Line((18.000000000000014, -FILLET1_R), (18.000000000000014, 0))
            Line((18.000000000000014, 0), (18.000000000000014 - FILLET1_R, 0))
        make_face()
    fillet1_piece_8 = revolve(axis=Axis((-3.872e-14, 0, -5.4e-16), (0, -1, 0)), revolution_arc=39.46607540970416, mode=Mode.PRIVATE)
    fillet1_piece_8 = split(fillet1_piece_8, bisect_by=Plane(origin=(-1.0000000000000024, 0.4612120759147971, -17.37087269742329), z_dir=(-1, 0, 0)), keep=Keep.TOP, mode=Mode.PRIVATE)
    add(fillet1_piece_8, mode=Mode.SUBTRACT)
    with BuildSketch(Plane(origin=(-3.872e-14, 0, -5.4e-16), x_dir=(-0.22037727986092012, 0, -0.9754147089936167), z_dir=(-0.9754147089936167, 0, 0.22037727986092012))) as fillet1_piece_9_section:
        with BuildLine():
            CenterArc((18.000000000000014 - FILLET1_R, -FILLET1_R), FILLET1_R, 1.272e-14, 90)
            Line((18.000000000000014, -FILLET1_R), (18.000000000000014, 0))
            Line((18.000000000000014, 0), (18.000000000000014 - FILLET1_R, 0))
        make_face()
    fillet1_piece_9 = revolve(axis=Axis((-3.872e-14, 0, -5.4e-16), (0, -1, 0)), revolution_arc=39.46607540970416, mode=Mode.PRIVATE)
    fillet1_piece_9 = split(fillet1_piece_9, bisect_by=Plane(origin=(0.999999999999987, 0.4599214469726478, -16.84263631620444), z_dir=(1, 0, 5e-15)), keep=Keep.TOP, mode=Mode.PRIVATE)
    add(fillet1_piece_9, mode=Mode.SUBTRACT)

    # Fillet2
    fillet2_edges = [part.edges().sort_by_distance(p)[0] for p in [
        (4.646545909149891, 8.8, -17.38992843901787),
        (-4.646545909149905, 8.8, -17.389928439017865),
        (16.099999999999994, 8.799999999999999, 0),
        (-16.1, 8.799999999999999, 0),
        (-12.747992845911156, 8.799999999999999, 12.70781957696123),
        (-12.747992845911165, 8.799999999999999, -12.707819576961219),
        (12.747992845911162, 8.799999999999999, 12.707819576961153),
        (12.74799284591116, 8.799999999999999, -12.707819576961155),
    ]]
    fillet(fillet2_edges, radius=FILLET2_R)


solid = part.part
